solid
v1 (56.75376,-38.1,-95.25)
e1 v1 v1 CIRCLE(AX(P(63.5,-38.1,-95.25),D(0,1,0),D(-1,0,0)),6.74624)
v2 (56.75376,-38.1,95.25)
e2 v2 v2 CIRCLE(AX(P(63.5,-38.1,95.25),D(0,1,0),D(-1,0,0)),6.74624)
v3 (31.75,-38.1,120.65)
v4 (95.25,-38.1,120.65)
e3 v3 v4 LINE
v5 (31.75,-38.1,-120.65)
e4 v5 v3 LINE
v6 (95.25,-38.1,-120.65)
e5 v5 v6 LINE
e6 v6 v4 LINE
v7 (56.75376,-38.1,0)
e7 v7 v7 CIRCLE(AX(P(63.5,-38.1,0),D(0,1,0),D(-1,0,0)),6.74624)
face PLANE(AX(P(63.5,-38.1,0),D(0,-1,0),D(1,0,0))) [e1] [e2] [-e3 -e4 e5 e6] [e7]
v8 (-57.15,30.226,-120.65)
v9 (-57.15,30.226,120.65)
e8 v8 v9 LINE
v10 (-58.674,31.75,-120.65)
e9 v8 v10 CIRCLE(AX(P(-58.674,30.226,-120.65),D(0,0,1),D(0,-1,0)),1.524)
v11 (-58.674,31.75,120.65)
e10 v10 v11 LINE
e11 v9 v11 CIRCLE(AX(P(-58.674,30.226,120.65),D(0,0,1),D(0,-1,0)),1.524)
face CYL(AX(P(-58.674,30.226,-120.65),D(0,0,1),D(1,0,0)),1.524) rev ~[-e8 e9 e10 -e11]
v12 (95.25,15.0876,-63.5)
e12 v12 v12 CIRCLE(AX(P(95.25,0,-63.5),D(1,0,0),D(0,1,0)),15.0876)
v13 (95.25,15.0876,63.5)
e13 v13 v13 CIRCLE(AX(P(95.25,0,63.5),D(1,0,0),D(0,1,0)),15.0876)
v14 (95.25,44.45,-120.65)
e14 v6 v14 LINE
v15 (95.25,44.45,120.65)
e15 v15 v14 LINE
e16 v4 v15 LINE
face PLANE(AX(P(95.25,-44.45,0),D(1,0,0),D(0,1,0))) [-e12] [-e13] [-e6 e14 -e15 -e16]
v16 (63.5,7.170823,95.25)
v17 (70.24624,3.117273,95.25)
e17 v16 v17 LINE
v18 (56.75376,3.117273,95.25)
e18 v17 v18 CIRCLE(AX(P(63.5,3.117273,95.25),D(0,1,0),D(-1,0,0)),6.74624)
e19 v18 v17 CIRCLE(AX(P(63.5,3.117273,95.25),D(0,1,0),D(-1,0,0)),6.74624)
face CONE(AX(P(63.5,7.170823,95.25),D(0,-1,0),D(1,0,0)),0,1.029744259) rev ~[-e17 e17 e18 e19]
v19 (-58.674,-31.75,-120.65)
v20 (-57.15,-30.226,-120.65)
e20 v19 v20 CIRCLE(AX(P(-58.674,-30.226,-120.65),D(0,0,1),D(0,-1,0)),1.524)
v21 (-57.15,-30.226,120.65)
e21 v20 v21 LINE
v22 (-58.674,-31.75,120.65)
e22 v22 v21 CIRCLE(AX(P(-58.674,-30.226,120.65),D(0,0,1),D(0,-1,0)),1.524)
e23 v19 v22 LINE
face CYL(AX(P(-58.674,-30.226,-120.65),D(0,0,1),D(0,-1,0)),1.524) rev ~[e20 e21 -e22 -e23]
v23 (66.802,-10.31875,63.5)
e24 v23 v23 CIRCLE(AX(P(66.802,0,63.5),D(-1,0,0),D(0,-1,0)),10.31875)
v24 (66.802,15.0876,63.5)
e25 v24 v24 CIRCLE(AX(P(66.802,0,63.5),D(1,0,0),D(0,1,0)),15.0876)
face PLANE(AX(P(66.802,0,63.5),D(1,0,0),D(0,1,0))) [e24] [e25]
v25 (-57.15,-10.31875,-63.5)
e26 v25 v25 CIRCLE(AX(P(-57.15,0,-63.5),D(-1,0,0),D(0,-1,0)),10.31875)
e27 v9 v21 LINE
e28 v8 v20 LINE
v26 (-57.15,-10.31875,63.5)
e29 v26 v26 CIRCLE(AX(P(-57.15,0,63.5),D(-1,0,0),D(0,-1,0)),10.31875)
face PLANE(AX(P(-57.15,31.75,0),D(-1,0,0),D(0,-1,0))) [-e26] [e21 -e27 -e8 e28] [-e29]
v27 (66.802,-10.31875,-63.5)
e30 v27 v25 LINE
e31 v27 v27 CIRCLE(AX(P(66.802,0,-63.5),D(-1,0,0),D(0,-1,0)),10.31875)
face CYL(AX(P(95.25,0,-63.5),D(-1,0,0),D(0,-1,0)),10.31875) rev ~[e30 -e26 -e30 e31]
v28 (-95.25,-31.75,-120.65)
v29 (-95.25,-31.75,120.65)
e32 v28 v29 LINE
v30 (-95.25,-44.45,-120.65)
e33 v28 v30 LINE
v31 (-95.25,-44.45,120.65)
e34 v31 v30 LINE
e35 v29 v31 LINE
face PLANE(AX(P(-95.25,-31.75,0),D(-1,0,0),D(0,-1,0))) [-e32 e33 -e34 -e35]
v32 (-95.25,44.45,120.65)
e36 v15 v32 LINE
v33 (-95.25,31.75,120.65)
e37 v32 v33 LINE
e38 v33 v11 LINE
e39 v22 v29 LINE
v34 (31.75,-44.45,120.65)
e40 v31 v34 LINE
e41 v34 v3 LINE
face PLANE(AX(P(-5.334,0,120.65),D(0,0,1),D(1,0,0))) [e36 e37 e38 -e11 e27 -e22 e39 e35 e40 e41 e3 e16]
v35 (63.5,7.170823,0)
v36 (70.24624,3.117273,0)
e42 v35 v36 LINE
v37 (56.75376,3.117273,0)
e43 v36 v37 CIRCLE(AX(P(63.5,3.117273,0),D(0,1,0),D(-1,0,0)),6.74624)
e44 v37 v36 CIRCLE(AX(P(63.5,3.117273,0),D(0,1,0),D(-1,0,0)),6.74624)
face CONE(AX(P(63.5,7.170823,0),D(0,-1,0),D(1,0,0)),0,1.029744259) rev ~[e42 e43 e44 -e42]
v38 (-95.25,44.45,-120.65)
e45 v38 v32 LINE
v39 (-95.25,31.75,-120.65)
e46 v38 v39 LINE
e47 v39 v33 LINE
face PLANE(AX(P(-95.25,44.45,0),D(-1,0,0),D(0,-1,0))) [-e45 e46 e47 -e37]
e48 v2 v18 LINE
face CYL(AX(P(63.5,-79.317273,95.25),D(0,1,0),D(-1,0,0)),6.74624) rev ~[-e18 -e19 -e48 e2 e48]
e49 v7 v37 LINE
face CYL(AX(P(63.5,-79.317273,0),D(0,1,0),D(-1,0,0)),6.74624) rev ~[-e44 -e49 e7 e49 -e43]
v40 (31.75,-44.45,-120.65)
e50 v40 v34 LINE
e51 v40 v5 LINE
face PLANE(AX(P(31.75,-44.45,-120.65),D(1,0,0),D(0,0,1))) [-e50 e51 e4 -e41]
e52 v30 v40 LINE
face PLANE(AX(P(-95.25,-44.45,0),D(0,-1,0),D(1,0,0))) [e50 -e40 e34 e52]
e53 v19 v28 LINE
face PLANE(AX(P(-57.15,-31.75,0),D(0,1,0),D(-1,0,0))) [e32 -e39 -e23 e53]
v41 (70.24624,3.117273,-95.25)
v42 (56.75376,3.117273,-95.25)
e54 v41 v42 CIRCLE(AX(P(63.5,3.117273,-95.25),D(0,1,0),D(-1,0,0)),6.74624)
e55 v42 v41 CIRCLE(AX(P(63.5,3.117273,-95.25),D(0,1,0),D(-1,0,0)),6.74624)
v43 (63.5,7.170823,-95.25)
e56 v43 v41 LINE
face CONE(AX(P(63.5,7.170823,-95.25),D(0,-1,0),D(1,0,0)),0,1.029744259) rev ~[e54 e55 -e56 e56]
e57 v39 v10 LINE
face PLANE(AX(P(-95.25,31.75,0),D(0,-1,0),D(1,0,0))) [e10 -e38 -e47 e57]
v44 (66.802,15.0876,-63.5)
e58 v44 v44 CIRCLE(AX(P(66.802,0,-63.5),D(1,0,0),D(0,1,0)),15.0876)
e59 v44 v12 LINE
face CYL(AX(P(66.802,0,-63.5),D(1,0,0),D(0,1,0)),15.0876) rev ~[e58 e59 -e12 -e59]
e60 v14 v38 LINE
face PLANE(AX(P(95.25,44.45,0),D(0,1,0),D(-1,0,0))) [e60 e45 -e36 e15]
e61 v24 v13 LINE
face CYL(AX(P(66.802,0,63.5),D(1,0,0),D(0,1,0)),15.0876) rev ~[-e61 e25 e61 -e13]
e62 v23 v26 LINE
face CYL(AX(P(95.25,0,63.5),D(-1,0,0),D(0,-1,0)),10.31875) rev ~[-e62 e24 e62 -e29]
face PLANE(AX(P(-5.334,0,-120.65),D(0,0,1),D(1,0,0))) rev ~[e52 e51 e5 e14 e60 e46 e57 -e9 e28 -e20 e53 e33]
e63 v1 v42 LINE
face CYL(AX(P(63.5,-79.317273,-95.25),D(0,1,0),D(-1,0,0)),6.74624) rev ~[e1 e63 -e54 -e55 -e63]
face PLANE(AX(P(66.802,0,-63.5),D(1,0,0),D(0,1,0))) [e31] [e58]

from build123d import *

# Parameters (mm, degrees)
F1_DEPTH       = 120.65
F2_R           = 1.524
F4_D           = 20.6375
F4_CBORE_D     = 30.1752
F4_CBORE_DEPTH = 28.448
F5_W           = 63.5
F5_H           = 241.3
F6_DEPTH       = 6.35
F8_D           = 13.49248
F8_DEPTH       = 41.2172727273
F8_TIP         = 4.0535499425


# Not quite as in the source:
# - a length typed as a fraction of an inch, garbled in the dataset ("3 / 203.2 mm" for 3/8 in), is restored


with BuildPart() as f1:
    # F0 (on Top) → F1 (new body, symmetric)
    with BuildSketch(Plane.XY):
        Polygon((95.25, 44.45), (-95.25, 44.45), (-95.25, 31.75), (-57.15, 31.75), (-57.15, -31.75), (-95.25, -31.75), (-95.25, -44.45), (95.25, -44.45), align=None)
    extrude(amount=F1_DEPTH, both=True)

    # F2
    f2_edges = [f1.edges().sort_by_distance(p)[0] for p in [
        (-57.15, 31.75, 0),
        (-57.15, -31.75, 0),
    ]]
    fillet(f2_edges, radius=F2_R)

    # F4 (through all)
    with Locations(Plane.YZ.offset(95.25)):
        with Locations((0, 63.5), (0, -63.5)):
            CounterBoreHole(F4_D / 2, F4_CBORE_D / 2, F4_CBORE_DEPTH)

    # F5 (on face) → F6 (cut)
    with BuildSketch(Plane.XZ.offset(44.45)):
        with Locations((63.5, 0)):
            Rectangle(F5_W, F5_H)
    extrude(amount=-F6_DEPTH, mode=Mode.SUBTRACT)

    # F8
    with Locations(Plane.XZ.offset(38.1)):
        with Locations((63.5, 95.25), (63.5, 0), (63.5, -95.25)):
            Hole(F8_D / 2, depth=F8_DEPTH)
            with Locations((0, 0, -(F8_DEPTH + F8_TIP / 2))):  # 118° drill point
                Cone(0, F8_D / 2, F8_TIP, mode=Mode.SUBTRACT)


solid = f1.part
